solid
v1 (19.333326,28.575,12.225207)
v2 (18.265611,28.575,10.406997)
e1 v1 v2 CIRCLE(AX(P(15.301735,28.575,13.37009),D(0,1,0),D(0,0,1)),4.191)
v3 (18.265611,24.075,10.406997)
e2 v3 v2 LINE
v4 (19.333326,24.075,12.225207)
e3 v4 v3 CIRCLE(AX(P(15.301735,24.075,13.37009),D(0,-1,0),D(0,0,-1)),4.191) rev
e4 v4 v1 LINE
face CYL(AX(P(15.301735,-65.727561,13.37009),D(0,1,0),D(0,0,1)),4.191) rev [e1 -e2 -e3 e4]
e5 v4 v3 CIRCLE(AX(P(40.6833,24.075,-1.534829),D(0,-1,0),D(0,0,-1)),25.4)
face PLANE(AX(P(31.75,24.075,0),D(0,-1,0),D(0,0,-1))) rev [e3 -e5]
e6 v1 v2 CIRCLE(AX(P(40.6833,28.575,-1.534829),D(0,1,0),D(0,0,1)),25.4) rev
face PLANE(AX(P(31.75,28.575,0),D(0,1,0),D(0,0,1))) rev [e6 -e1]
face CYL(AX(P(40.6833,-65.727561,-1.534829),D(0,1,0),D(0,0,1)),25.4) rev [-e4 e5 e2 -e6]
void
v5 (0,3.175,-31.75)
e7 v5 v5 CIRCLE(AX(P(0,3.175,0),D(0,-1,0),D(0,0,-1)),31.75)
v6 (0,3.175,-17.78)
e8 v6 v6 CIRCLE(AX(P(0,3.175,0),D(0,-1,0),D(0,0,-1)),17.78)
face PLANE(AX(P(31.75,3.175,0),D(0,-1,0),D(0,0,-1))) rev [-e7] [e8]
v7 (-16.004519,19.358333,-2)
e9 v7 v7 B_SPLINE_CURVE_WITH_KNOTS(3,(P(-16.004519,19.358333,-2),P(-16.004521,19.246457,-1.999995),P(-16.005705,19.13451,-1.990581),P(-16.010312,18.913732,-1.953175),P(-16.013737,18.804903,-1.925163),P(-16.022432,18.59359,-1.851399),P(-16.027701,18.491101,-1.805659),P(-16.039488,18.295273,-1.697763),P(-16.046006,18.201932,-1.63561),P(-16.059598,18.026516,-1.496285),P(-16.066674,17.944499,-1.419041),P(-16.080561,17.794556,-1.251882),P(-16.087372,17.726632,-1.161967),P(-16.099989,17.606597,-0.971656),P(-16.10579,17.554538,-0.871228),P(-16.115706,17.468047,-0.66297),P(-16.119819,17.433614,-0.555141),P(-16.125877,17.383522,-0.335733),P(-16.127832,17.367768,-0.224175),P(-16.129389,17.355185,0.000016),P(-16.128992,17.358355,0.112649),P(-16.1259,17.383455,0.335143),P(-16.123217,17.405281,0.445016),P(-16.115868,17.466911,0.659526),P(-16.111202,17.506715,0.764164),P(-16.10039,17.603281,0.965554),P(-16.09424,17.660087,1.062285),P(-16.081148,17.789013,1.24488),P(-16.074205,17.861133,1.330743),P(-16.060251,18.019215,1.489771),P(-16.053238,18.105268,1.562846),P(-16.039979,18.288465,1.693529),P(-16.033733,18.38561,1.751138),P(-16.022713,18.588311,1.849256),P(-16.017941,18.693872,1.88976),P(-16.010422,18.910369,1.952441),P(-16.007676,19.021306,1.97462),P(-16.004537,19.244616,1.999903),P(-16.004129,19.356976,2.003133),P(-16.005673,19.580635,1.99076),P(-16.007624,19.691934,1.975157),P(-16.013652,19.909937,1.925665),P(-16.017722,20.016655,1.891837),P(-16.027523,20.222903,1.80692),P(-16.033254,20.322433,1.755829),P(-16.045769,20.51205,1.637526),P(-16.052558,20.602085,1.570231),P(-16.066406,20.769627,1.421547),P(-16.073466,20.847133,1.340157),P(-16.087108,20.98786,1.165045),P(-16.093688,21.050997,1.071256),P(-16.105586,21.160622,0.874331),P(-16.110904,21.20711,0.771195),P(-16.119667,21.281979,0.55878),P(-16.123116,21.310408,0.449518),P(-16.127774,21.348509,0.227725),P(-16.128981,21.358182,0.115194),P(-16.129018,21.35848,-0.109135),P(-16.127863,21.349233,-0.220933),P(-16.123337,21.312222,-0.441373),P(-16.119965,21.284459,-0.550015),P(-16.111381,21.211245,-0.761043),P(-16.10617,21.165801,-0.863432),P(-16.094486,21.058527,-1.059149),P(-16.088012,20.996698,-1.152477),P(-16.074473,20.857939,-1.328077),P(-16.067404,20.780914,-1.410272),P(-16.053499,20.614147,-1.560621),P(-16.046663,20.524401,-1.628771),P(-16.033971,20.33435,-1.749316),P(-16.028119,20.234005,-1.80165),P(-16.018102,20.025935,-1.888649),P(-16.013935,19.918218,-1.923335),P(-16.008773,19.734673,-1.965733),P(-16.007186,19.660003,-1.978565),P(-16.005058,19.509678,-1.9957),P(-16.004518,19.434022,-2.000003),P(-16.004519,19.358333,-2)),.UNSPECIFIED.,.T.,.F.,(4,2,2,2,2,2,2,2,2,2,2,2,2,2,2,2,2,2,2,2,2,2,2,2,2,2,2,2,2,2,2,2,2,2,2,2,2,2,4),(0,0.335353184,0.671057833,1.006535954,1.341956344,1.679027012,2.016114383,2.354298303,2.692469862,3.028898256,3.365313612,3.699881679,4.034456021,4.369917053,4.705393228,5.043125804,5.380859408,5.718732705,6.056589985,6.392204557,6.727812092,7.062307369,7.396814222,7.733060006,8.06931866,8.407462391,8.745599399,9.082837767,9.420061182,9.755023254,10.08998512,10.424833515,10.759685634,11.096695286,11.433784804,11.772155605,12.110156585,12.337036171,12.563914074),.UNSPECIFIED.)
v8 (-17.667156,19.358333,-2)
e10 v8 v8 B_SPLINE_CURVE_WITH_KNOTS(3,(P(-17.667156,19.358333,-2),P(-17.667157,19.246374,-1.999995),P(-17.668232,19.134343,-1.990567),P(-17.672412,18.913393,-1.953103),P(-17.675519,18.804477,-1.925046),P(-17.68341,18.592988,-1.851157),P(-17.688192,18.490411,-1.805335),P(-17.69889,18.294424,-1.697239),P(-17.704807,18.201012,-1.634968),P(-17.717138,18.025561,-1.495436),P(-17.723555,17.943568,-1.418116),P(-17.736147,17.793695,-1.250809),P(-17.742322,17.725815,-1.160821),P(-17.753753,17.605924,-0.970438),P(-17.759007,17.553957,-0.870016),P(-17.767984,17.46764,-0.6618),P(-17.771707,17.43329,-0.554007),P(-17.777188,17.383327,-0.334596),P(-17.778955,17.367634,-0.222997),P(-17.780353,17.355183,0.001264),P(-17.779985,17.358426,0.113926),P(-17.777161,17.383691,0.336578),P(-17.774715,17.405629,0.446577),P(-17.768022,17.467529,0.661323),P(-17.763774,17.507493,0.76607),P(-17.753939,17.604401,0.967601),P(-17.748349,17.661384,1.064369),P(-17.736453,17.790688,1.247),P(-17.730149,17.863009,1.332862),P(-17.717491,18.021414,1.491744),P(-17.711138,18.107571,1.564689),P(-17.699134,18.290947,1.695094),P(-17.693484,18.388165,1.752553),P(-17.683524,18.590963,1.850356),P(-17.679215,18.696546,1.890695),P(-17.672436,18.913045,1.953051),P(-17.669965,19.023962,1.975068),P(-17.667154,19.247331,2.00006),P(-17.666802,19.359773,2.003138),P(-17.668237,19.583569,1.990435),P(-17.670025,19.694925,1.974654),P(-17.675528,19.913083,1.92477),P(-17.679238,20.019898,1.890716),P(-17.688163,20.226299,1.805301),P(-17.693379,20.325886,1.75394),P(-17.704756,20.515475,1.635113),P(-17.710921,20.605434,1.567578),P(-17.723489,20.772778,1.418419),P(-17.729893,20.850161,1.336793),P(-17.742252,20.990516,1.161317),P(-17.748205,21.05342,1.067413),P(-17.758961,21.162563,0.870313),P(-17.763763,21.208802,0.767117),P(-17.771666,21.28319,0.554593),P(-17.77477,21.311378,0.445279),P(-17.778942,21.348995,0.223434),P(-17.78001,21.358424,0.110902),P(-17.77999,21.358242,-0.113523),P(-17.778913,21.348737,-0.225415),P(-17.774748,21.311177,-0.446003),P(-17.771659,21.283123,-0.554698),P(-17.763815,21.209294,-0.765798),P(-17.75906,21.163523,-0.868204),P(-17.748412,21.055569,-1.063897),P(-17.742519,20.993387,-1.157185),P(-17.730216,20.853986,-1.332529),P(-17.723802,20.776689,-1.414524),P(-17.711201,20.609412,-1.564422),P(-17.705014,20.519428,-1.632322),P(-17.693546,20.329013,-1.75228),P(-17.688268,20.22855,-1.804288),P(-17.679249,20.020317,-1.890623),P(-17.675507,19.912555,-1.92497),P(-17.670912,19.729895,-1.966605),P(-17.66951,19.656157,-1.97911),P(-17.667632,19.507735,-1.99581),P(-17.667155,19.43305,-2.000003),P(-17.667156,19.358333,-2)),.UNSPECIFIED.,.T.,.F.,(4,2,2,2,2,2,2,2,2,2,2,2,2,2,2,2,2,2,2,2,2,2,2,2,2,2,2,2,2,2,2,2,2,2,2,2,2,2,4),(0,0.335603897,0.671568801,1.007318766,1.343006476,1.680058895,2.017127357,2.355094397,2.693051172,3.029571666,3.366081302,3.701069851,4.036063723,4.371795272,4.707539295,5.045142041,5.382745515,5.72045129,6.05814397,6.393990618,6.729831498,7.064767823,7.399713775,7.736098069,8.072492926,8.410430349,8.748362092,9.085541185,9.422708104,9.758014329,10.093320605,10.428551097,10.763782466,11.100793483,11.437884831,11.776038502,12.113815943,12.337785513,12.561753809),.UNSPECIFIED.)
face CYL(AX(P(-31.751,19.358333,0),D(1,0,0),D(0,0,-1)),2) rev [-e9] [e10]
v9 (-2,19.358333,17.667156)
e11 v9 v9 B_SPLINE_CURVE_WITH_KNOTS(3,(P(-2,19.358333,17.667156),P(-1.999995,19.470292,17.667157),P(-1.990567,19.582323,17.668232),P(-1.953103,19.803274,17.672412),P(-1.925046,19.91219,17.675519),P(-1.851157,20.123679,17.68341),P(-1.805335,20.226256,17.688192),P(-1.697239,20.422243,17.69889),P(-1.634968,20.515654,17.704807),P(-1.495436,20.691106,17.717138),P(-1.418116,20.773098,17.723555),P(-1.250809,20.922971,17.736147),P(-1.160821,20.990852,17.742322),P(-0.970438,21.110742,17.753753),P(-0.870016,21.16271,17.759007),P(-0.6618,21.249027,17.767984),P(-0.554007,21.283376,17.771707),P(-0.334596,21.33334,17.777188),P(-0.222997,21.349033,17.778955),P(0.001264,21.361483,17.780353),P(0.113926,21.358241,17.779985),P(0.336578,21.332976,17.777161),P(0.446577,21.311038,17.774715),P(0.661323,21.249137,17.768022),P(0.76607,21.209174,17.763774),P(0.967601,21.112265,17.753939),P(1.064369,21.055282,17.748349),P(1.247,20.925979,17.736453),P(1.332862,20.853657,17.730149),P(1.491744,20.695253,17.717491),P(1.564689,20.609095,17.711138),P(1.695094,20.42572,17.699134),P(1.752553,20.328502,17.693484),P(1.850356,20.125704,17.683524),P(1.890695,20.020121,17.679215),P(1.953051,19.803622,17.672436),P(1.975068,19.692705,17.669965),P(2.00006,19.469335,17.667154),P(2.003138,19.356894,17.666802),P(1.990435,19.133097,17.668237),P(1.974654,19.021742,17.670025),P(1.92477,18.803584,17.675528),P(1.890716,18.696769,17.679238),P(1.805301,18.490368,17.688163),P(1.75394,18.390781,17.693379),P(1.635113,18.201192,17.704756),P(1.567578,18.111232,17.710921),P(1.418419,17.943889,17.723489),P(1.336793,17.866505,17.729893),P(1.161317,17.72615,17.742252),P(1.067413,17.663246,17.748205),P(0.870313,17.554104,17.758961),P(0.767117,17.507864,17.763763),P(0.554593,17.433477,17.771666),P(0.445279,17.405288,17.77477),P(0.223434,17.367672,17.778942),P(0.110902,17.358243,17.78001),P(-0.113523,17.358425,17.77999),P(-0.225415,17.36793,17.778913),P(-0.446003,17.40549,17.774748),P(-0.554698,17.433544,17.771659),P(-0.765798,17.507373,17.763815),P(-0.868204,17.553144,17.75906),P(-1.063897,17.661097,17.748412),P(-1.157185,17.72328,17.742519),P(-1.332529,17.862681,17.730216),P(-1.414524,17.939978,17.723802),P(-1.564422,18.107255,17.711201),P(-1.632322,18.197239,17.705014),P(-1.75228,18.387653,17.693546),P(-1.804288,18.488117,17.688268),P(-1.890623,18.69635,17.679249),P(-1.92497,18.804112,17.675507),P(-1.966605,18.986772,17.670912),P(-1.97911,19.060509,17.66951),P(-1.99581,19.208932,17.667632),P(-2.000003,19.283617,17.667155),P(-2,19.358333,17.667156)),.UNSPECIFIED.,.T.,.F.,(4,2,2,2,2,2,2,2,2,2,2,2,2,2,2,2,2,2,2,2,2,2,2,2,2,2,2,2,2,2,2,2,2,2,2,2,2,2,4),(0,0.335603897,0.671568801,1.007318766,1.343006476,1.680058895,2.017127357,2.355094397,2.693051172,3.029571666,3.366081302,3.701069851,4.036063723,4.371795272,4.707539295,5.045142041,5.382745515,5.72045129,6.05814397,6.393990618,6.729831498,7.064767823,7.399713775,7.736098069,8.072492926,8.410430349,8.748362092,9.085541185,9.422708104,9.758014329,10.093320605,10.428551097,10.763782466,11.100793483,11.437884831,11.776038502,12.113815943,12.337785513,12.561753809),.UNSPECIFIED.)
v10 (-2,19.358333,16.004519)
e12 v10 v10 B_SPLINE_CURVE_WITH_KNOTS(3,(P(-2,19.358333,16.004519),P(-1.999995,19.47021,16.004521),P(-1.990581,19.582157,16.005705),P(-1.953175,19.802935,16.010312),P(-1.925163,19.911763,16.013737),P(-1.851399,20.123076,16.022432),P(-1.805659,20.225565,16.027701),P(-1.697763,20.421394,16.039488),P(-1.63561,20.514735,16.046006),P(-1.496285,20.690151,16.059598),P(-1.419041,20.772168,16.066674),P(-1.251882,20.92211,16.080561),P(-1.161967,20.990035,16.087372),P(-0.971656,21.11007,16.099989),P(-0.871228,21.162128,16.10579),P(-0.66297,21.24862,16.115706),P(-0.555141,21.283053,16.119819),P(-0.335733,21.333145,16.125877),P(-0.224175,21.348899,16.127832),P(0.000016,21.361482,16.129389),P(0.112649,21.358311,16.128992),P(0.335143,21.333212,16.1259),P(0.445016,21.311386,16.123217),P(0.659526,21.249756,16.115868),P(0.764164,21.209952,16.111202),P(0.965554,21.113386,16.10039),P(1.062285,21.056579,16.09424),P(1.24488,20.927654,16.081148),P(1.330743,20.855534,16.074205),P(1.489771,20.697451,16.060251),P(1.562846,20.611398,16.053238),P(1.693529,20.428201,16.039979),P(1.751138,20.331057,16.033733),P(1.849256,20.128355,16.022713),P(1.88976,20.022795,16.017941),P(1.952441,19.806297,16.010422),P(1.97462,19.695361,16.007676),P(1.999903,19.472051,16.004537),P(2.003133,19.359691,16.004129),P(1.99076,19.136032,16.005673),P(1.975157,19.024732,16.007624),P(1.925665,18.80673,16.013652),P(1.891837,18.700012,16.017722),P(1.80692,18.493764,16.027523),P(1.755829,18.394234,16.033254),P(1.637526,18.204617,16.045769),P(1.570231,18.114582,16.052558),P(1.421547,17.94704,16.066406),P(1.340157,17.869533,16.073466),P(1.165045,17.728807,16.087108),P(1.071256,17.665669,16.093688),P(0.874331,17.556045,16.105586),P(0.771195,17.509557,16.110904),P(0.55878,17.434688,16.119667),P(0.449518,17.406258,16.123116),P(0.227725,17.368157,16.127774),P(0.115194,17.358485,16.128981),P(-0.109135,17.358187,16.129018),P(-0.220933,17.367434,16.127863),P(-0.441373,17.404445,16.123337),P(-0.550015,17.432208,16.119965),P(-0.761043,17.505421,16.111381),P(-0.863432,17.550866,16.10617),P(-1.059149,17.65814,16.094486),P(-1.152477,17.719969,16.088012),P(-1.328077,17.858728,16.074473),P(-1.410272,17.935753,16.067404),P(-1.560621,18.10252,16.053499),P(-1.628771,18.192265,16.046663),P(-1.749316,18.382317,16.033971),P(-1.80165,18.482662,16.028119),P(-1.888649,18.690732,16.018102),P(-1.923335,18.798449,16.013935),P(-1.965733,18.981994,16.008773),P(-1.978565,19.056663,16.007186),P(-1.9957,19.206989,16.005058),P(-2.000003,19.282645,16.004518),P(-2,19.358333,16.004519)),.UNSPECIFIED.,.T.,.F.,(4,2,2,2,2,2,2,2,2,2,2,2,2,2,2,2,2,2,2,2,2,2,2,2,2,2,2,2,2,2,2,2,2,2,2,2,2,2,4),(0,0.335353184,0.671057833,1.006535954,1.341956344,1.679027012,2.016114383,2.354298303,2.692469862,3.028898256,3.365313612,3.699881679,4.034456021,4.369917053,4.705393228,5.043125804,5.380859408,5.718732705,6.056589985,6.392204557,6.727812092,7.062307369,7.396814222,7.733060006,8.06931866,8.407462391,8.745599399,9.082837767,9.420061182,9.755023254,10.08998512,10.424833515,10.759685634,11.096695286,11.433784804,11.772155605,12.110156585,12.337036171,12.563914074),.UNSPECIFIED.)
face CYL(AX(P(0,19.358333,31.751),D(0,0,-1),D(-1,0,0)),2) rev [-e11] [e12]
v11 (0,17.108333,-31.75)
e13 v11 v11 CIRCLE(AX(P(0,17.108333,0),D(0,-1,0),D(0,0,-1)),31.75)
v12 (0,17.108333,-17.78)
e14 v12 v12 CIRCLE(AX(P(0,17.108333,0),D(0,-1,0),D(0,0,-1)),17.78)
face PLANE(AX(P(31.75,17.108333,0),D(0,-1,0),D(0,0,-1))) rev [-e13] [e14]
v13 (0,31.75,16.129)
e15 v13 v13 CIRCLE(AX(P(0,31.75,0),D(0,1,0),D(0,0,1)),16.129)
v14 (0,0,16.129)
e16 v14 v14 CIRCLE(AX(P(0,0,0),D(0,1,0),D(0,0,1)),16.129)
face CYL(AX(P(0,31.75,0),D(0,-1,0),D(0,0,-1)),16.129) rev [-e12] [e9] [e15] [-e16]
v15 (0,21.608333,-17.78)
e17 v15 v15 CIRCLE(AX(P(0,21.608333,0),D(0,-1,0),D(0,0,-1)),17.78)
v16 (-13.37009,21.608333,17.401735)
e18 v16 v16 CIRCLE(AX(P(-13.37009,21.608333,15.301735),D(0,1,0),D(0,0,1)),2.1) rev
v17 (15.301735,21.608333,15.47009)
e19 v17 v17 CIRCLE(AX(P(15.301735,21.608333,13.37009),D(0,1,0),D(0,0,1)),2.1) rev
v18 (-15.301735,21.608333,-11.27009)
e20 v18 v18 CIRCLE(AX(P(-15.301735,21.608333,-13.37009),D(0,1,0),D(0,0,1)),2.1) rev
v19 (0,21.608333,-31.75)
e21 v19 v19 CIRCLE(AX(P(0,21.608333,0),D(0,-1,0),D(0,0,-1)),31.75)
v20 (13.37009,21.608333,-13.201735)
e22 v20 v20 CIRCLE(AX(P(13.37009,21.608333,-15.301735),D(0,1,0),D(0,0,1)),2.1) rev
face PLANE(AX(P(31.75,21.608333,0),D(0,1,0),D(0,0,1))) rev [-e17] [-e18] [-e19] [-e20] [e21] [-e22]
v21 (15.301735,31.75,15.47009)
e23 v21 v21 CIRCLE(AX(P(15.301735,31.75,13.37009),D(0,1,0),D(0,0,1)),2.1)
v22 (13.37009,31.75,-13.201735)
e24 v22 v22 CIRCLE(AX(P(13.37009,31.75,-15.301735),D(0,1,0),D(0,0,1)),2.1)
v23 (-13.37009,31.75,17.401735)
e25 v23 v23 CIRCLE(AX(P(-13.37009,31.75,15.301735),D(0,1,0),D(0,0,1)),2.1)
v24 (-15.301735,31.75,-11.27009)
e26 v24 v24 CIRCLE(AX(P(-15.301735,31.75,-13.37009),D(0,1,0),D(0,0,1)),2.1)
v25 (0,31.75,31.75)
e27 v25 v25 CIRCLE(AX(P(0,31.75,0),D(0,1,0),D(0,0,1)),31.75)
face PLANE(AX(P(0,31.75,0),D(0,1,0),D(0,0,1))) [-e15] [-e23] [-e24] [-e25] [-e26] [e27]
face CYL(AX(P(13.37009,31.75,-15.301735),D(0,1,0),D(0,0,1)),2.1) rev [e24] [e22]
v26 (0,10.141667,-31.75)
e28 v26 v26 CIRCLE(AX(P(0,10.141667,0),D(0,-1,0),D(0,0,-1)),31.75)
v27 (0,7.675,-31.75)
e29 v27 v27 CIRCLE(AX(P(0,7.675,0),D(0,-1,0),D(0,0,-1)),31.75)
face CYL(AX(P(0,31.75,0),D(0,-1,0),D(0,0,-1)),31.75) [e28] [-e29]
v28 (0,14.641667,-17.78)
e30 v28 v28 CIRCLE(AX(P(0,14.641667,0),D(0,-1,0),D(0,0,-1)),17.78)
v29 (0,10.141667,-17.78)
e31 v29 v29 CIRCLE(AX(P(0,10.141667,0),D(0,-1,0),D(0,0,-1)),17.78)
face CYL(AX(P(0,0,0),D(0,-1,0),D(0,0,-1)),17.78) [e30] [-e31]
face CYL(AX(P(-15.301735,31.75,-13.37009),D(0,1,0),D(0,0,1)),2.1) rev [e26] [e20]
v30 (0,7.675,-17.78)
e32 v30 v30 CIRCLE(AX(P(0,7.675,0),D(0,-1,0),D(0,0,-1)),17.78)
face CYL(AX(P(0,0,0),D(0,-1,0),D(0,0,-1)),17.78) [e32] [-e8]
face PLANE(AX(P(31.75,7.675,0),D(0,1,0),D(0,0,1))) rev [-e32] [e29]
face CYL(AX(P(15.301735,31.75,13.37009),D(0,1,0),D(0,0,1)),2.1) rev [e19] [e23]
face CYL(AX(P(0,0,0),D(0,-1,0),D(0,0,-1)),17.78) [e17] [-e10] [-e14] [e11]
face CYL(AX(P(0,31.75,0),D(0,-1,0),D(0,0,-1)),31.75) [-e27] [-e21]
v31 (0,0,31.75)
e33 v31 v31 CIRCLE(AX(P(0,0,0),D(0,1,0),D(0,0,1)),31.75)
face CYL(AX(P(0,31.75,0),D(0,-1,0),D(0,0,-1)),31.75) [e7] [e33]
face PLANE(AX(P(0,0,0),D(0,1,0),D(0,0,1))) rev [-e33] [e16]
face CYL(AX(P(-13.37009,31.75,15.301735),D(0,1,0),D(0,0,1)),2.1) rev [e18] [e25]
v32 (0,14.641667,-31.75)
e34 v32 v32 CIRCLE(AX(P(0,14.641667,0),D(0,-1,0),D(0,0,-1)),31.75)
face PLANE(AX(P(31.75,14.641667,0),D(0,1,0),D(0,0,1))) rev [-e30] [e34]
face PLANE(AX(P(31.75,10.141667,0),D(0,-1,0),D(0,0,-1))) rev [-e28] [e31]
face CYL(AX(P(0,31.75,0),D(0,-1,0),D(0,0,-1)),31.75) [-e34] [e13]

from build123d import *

# Parameters (mm, degrees)
SKETCH1_R                        = 31.75
SKETCH1_R_2                      = 16.129
BOSS_EXTRUDE1_DEPTH              = 31.75
SKETCH2_W                        = 13.97
SKETCH2_H                        = 4.5
BOSS_EXTRUDE2_START              = -7.675
BOSS_EXTRUDE2_OUTLINE_R          = 31.75
BOSS_EXTRUDE2_OUTLINE_R_2        = 17.78
BOSS_EXTRUDE2_DEPTH              = 4.5
CUT_EXTRUDE2_REACH               = 56.993
CUT_EXTRUDE2_END_RADIUS          = 17.78
SKETCH8_R                        = 2
CUT_EXTRUDE3_REACH               = 56.993
CUT_EXTRUDE3_END_RADIUS          = 17.78
SKETCH9_R                        = 2
SKETCH10_R                       = 1
CUT_EXTRUDE4_DEPTH               = 10.141666667
TAP_DRILL_FOR_M5X0_8_TAP1_REACH  = 74.51
TAP_DRILL_FOR_M5X0_8_TAP1_BORE_R = 2.1


# Read off the part's stored shape, not the designer's step: Boss-Extrude2
with BuildPart() as part:
    # Sketch1 → Boss-Extrude1 (new body)
    with BuildSketch(Plane(origin=(0, 0, 0), x_dir=(1, 0, 0), z_dir=(0, 1, 0))):
        with Locations(Location((0, 0, 0), (0, 0, 270))):
            Circle(SKETCH1_R)
        with Locations(Location((0, 0, 0), (0, 0, 270))):
            Circle(SKETCH1_R_2, mode=Mode.SUBTRACT)
    extrude(amount=BOSS_EXTRUDE1_DEPTH)

    # Sketch2 → Cut-Revolve2 (revolve, cut)
    with BuildSketch(Plane.XY, mode=Mode.PRIVATE) as cut_revolve2_sk:
        with Locations((24.765, 26.325)):
            Rectangle(SKETCH2_W, SKETCH2_H)
        with Locations((24.765, 12.391666667)):
            Rectangle(SKETCH2_W, SKETCH2_H)
        with Locations((24.765, 5.425)):
            Rectangle(SKETCH2_W, SKETCH2_H)
        with Locations((24.765, 19.358333333)):
            Rectangle(SKETCH2_W, SKETCH2_H)
    revolve(cut_revolve2_sk.sketch.rotate(Axis((0, 0, 0), (0, 1, 0)), 90), axis=Axis((0, 0, 0), (0, 1, 0)), mode=Mode.SUBTRACT)

    # Boss-Extrude2 outline → Boss-Extrude2 (add)
    with BuildSketch(Plane(origin=(0, 31.75, 0), x_dir=(1, 0, 0), z_dir=(0, 1, 0)).offset(BOSS_EXTRUDE2_START)):
        Circle(BOSS_EXTRUDE2_OUTLINE_R)
        with BuildLine():
            ThreePointArc((18.265610967, -10.406997066), (18.915681572, -11.247857531), (19.33332562, -12.225206784))
            ThreePointArc((19.33332562, -12.225206784), (18.780593277, -11.327185978), (18.265610967, -10.406997066))
        make_face(mode=Mode.SUBTRACT)
        Circle(BOSS_EXTRUDE2_OUTLINE_R_2, mode=Mode.SUBTRACT)
    extrude(amount=BOSS_EXTRUDE2_DEPTH)

    # Cut-Extrude2: up to this cylinder (the profile starts inside it)
    cut_extrude2_end = Plane(origin=(0, 19.358333, 0), z_dir=(0, -1, 0)) * Cylinder(CUT_EXTRUDE2_END_RADIUS, 150.546, mode=Mode.PRIVATE)
    # Sketch8 → Cut-Extrude2 (cut, up to the surface)
    with BuildSketch(Plane.XY, mode=Mode.PRIVATE) as cut_extrude2_sk1:
        with Locations(Location((0, 19.358333333, 0), (0, 0, 180))):
            Circle(SKETCH8_R)
    cut_extrude2_tool1 = extrude(cut_extrude2_sk1.sketch, amount=CUT_EXTRUDE2_REACH, mode=Mode.PRIVATE) & cut_extrude2_end
    add(cut_extrude2_tool1.solids().sort_by_distance((0, 19.358333, 0))[0], mode=Mode.SUBTRACT)

    # Cut-Extrude3: up to this cylinder (the profile starts inside it)
    cut_extrude3_end = Plane(origin=(0, 19.358333, 0), z_dir=(0, -1, 0)) * Cylinder(CUT_EXTRUDE3_END_RADIUS, 150.546, mode=Mode.PRIVATE)
    # Sketch9 → Cut-Extrude3 (cut, up to the surface)
    with BuildSketch(Plane(origin=(0, 0, 0), x_dir=(0, 0, -1), z_dir=(1, 0, 0)), mode=Mode.PRIVATE) as cut_extrude3_sk1:
        with Locations((0, 19.358333333)):
            Circle(SKETCH9_R)
    cut_extrude3_tool1 = extrude(cut_extrude3_sk1.sketch, amount=-CUT_EXTRUDE3_REACH, mode=Mode.PRIVATE) & cut_extrude3_end
    add(cut_extrude3_tool1.solids().sort_by_distance((0, 19.358333, 0))[0], mode=Mode.SUBTRACT)

    # Sketch10 → Cut-Extrude4 (cut)
    with BuildSketch(Plane(origin=(0, 31.75, 0), x_dir=(1, 0, 0), z_dir=(0, 1, 0))):
        with Locations(Location((15.301734948, -13.370090036, 0), (0, 0, 270))):
            Circle(SKETCH10_R)
        with Locations(Location((13.370090036, 15.301734948, 0), (0, 0, 270))):
            Circle(SKETCH10_R)
        with Locations(Location((-15.301734948, 13.370090036, 0), (0, 0, 270))):
            Circle(SKETCH10_R)
        with Locations(Location((-13.370090036, -15.301734948, 0), (0, 0, 270))):
            Circle(SKETCH10_R)
    extrude(amount=-CUT_EXTRUDE4_DEPTH, mode=Mode.SUBTRACT)

    # Tap Drill for M5x0.8 Tap1 bore (on position points) → Tap Drill for M5x0.8 Tap1 (cut, up to next)
    with BuildSketch(Plane(origin=(15.301734948, 31.75, 13.370090036), x_dir=(0, 0, 1), z_dir=(0, 1, 0)), mode=Mode.PRIVATE) as tap_drill_for_m5x0_8_tap1_sk1:
        Circle(TAP_DRILL_FOR_M5X0_8_TAP1_BORE_R)
    tap_drill_for_m5x0_8_tap1_tool1 = extrude(tap_drill_for_m5x0_8_tap1_sk1.sketch, amount=-TAP_DRILL_FOR_M5X0_8_TAP1_REACH, mode=Mode.PRIVATE) & part.part
    # Tap Drill for M5x0.8 Tap1 bore (on position points) → Tap Drill for M5x0.8 Tap1 (cut, up to next)
    with BuildSketch(Plane(origin=(15.301734948, 31.75, 13.370090036), x_dir=(0, 0, 1), z_dir=(0, 1, 0)), mode=Mode.PRIVATE) as tap_drill_for_m5x0_8_tap1_sk2:
        with Locations((1.931644912, -28.671824984)):
            Circle(TAP_DRILL_FOR_M5X0_8_TAP1_BORE_R)
    tap_drill_for_m5x0_8_tap1_tool2 = extrude(tap_drill_for_m5x0_8_tap1_sk2.sketch, amount=-TAP_DRILL_FOR_M5X0_8_TAP1_REACH, mode=Mode.PRIVATE) & part.part
    # Tap Drill for M5x0.8 Tap1 bore (on position points) → Tap Drill for M5x0.8 Tap1 (cut, up to next)
    with BuildSketch(Plane(origin=(15.301734948, 31.75, 13.370090036), x_dir=(0, 0, 1), z_dir=(0, 1, 0)), mode=Mode.PRIVATE) as tap_drill_for_m5x0_8_tap1_sk3:
        with Locations((-26.740180072, -30.603469896)):
            Circle(TAP_DRILL_FOR_M5X0_8_TAP1_BORE_R)
    tap_drill_for_m5x0_8_tap1_tool3 = extrude(tap_drill_for_m5x0_8_tap1_sk3.sketch, amount=-TAP_DRILL_FOR_M5X0_8_TAP1_REACH, mode=Mode.PRIVATE) & part.part
    # Tap Drill for M5x0.8 Tap1 bore (on position points) → Tap Drill for M5x0.8 Tap1 (cut, up to next)
    with BuildSketch(Plane(origin=(15.301734948, 31.75, 13.370090036), x_dir=(0, 0, 1), z_dir=(0, 1, 0)), mode=Mode.PRIVATE) as tap_drill_for_m5x0_8_tap1_sk4:
        with Locations((-28.671824984, -1.931644912)):
            Circle(TAP_DRILL_FOR_M5X0_8_TAP1_BORE_R)
    tap_drill_for_m5x0_8_tap1_tool4 = extrude(tap_drill_for_m5x0_8_tap1_sk4.sketch, amount=-TAP_DRILL_FOR_M5X0_8_TAP1_REACH, mode=Mode.PRIVATE) & part.part
    add(tap_drill_for_m5x0_8_tap1_tool1.solids().sort_by_distance((15.301735, 31.75, 13.37009))[0], mode=Mode.SUBTRACT)
    add(tap_drill_for_m5x0_8_tap1_tool2.solids().sort_by_distance((-13.37009, 31.75, 15.301735))[0], mode=Mode.SUBTRACT)
    add(tap_drill_for_m5x0_8_tap1_tool3.solids().sort_by_distance((-15.301735, 31.75, -13.37009))[0], mode=Mode.SUBTRACT)
    add(tap_drill_for_m5x0_8_tap1_tool4.solids().sort_by_distance((13.37009, 31.75, -15.301735))[0], mode=Mode.SUBTRACT)


solid = part.part
